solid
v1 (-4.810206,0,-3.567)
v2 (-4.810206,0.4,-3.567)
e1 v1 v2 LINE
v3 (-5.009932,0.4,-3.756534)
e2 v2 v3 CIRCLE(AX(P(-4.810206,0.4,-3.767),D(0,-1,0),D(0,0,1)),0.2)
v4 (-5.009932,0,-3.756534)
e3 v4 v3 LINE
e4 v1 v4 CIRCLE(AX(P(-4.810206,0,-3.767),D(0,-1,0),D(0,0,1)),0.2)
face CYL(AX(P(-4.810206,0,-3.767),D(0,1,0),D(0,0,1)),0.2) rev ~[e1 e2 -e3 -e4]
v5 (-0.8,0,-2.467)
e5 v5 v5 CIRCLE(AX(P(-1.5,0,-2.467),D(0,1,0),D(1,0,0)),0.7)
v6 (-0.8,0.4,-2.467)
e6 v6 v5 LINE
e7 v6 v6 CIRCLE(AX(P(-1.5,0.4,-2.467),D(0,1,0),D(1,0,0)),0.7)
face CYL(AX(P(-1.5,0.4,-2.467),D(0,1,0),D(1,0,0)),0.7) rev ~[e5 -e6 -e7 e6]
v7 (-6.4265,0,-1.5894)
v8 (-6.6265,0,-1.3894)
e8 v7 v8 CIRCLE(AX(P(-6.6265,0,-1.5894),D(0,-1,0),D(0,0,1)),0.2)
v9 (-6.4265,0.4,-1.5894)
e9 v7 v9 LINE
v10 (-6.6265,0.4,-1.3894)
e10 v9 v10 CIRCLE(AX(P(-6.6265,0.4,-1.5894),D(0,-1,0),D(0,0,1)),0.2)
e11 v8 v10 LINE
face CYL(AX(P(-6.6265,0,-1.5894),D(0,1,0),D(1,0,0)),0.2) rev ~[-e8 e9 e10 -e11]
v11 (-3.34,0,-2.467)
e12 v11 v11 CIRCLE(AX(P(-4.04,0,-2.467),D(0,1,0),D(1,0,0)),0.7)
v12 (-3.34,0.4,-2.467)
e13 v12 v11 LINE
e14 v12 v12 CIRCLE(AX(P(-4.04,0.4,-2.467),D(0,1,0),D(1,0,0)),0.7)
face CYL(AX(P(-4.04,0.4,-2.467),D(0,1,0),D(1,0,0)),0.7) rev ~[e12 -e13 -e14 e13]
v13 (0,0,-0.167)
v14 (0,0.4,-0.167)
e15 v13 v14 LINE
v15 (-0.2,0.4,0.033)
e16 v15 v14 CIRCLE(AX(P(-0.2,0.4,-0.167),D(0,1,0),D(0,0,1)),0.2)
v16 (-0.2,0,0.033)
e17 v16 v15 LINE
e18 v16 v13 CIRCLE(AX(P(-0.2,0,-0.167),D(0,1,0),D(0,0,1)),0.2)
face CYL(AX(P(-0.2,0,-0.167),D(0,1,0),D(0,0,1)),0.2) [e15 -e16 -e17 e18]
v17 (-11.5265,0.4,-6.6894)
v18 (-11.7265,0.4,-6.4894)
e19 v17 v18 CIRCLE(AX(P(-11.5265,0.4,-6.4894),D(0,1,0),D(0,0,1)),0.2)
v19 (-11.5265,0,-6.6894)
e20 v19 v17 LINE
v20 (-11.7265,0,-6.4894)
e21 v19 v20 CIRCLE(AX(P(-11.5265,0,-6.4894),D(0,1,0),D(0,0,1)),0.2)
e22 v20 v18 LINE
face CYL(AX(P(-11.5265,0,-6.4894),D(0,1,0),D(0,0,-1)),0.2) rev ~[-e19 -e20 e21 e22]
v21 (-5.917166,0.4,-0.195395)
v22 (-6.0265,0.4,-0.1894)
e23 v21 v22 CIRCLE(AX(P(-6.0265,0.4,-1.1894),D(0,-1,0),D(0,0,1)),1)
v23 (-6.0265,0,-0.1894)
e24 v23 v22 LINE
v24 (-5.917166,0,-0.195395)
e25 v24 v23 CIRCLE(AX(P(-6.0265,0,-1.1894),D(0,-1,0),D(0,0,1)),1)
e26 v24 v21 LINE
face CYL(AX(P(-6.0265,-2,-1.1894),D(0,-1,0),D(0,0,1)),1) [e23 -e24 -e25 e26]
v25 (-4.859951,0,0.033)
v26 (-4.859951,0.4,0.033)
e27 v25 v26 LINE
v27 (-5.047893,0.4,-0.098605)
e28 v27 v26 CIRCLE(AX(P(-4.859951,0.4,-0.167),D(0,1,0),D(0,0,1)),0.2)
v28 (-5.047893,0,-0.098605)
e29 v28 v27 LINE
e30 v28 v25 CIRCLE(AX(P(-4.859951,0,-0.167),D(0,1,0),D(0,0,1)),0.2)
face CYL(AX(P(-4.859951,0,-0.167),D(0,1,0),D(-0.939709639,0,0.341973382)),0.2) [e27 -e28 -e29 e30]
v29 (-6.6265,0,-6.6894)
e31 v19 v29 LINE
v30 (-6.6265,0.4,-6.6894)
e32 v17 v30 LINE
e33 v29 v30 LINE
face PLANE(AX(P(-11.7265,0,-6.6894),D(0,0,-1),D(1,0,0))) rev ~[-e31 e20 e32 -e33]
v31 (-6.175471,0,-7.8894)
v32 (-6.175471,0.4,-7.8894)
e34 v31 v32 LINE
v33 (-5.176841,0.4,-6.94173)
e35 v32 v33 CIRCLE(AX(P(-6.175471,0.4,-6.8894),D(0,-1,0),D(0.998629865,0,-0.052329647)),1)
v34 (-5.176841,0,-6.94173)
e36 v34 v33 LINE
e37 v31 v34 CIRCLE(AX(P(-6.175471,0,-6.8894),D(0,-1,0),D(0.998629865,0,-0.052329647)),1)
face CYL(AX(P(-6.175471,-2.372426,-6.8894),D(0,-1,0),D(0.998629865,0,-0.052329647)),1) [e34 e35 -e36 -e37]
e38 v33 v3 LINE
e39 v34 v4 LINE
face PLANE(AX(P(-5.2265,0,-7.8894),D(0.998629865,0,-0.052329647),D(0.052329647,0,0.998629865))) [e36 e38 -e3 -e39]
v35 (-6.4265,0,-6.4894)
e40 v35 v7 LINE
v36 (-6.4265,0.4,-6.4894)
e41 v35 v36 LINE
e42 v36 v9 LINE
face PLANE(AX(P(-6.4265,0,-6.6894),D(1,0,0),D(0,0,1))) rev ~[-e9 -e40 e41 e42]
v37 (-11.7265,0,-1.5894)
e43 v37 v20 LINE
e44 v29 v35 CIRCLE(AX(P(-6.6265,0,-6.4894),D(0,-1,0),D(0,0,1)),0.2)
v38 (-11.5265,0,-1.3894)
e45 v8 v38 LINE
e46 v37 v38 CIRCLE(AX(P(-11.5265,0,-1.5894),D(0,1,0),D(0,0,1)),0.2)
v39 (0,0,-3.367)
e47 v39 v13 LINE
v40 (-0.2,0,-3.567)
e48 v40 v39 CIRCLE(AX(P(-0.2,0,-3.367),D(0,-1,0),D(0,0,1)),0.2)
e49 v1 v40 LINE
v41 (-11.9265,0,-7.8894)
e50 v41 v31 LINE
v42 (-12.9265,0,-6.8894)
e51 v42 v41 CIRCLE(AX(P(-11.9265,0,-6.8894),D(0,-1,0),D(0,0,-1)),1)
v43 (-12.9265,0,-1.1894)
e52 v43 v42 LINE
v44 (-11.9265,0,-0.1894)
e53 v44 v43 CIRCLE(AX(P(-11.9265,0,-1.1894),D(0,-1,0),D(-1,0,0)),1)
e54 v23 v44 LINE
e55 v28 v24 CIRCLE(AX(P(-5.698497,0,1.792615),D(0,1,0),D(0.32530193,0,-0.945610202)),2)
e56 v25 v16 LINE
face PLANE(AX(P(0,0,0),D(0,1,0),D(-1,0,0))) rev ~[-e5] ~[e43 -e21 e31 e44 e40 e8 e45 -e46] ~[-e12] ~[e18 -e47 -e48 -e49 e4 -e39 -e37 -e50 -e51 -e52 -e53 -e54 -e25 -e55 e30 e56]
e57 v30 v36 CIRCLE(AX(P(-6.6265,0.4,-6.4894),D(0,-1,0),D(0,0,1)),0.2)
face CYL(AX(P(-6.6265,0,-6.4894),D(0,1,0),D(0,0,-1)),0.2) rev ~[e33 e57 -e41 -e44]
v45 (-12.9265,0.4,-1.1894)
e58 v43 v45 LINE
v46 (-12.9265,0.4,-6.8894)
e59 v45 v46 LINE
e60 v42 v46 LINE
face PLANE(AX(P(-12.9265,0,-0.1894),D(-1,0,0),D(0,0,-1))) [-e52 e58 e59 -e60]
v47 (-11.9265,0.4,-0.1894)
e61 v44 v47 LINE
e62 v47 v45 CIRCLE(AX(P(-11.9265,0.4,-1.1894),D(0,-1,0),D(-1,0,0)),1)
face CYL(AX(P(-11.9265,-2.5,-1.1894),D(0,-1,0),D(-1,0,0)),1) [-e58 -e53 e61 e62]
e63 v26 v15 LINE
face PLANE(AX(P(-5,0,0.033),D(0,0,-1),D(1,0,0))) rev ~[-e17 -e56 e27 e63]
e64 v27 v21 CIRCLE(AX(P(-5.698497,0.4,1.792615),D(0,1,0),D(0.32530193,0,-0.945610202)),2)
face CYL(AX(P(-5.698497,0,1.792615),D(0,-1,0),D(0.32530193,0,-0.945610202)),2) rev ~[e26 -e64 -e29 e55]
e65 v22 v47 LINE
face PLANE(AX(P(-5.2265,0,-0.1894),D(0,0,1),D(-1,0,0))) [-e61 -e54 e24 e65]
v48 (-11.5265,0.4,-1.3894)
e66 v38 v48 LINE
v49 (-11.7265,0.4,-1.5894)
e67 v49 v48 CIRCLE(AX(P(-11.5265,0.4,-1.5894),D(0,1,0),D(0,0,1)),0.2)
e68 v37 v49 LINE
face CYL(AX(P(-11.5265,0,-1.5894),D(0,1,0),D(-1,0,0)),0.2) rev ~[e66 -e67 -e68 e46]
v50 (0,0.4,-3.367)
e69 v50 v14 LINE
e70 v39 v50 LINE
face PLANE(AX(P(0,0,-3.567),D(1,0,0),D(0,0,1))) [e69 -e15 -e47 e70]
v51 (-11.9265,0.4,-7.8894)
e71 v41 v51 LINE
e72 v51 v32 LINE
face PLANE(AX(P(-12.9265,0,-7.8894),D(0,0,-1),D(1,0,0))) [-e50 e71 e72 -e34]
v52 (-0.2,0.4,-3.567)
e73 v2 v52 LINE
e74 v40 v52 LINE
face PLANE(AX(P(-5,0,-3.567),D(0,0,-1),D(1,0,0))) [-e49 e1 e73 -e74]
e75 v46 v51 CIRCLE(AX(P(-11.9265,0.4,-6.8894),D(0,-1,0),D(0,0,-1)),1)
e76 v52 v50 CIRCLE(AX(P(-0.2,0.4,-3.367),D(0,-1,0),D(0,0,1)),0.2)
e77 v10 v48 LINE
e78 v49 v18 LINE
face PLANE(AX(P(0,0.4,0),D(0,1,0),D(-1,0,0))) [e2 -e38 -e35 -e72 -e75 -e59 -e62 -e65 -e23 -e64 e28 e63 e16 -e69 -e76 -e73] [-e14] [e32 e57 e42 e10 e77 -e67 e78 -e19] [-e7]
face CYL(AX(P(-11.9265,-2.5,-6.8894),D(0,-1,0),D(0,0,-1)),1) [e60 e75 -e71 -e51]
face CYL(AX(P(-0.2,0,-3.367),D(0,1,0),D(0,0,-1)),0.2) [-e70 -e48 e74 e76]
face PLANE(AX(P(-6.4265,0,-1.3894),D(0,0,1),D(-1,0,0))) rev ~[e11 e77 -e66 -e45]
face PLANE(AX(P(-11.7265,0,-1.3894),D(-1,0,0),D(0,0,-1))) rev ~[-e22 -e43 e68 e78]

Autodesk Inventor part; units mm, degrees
ref_plane "YZ Plane" through (0, 0, 0) normal (1, 0, 0) x (0, 1, 0)
ref_plane "XZ Plane" through (0, 0, 0) normal (0, 1, 0) x (-1, 0, 0)
ref_plane "XY Plane" through (0, 0, 0) normal (0, 0, 1) x (1, 0, 0)
sketch "Sketch1" plane through (0, 0, 0) normal (0, 1, 0) x (-1, 0, 0)
  line L0 (5, -3.567) -> (5, 0.033)
  line L1 (5, 0.033) -> (0, 0.033)
  line L2 (5.2265, -7.8894) -> (5, -3.567)
  line L3 (5.2265, -0.5894) -> (5, 0.033)
  line L4 (0, -3.567) -> (0, 0.033)
  line L5 (5, -3.567) -> (0, -3.567)
  line L6 (5.2265, -0.1894) -> (12.9265, -0.1894)
  line L7 (12.9265, -0.1894) -> (12.9265, -7.8894)
  line L8 (12.9265, -7.8894) -> (5.2265, -7.8894)
  line L9 (5.2265, -7.8894) -> (5.2265, -0.1894)
  line L10 (5.2265, -0.5894) -> (5.2265, -7.8894) construction
  line L11 (5.2265, -4.2394) -> (11.8919, -4.2394) construction
  line L12 (11.7265, -6.6894) -> (6.4265, -6.6894)
  line L13 (6.4265, -6.6894) -> (6.4265, -1.3894)
  line L14 (6.4265, -1.3894) -> (11.7265, -1.3894)
  line L15 (11.7265, -1.3894) -> (11.7265, -6.6894)
  point P0 (6.1218, -0.1118)
  point P1 (5.2265, -0.5894)
  point P2 (5.4261, -0.5894)
  dimension "d9" = 3.6
  dimension "d10" = 160
  dimension "d12" = 93
  dimension "d18" = 3.65
  dimension "d20" = 1.2
  dimension "d22" = 1.2
  dimension "d28" = 5
  dimension "d39" = 5.3
  dimension "d40" = 5.3
  dimension "d41" = 1.2
  dimension "d42" = 1.2
extrude "Extrusion1" add sketch "Sketch1" along normal blind 0.4
fillet "Fillet3" radius 1 4 edges at (-12.9265, 0.2, -0.1894) (-5.2265, 0.2, -0.1894) (-5.2265, 0.2, -7.8894) (-12.9265, 0.2, -7.8894)
fillet "Fillet4" radius 0.2 4 edges at (-6.4265, 0.2, -6.6894) (-11.7265, 0.2, -6.6894) (-11.7265, 0.2, -1.3894) (-6.4265, 0.2, -1.3894)
fillet "Fillet6" radius 0.2 4 edges at (-5, 0.2, 0.033) (0, 0.2, 0.033) (0, 0.2, -3.567) (-5, 0.2, -3.567)
sketch "Sketch2" plane through (0, 0.4, 0) normal (0, 1, 0) x (1, 0, 0)
  line L0 (0, 0.167) -> (0, 3.367) projected
  circle A0 centre (-4.04, 2.467) radius 0.7
  circle A1 centre (-1.5, 2.467) radius 0.7
  line L1 (-4.04, 2.467) -> (-1.5, 2.467) construction
  line L2 (-4.86, -0.033) -> (-0.2, -0.033) projected
  line L3 (-0.2, 3.567) -> (-4.8102, 3.567) projected
  point P0 (0, 0)
  dimension "d29" = 1.4
  dimension "d31" = 2.54
  dimension "d32" = 1.5
  dimension "d38" = 1.1
extrude "Extrusion2" cut sketch "Sketch2" against normal blind 0.4
fillet "Fillet8" [suppressed]
fillet "Fillet9" radius 2 1 edges at (-5.2265, 0.2, -0.5894)
equation "\"d18\" = 0.5 * d15"
equation "\"d15\" = 7.3"
properties part number "PCB_arm"
